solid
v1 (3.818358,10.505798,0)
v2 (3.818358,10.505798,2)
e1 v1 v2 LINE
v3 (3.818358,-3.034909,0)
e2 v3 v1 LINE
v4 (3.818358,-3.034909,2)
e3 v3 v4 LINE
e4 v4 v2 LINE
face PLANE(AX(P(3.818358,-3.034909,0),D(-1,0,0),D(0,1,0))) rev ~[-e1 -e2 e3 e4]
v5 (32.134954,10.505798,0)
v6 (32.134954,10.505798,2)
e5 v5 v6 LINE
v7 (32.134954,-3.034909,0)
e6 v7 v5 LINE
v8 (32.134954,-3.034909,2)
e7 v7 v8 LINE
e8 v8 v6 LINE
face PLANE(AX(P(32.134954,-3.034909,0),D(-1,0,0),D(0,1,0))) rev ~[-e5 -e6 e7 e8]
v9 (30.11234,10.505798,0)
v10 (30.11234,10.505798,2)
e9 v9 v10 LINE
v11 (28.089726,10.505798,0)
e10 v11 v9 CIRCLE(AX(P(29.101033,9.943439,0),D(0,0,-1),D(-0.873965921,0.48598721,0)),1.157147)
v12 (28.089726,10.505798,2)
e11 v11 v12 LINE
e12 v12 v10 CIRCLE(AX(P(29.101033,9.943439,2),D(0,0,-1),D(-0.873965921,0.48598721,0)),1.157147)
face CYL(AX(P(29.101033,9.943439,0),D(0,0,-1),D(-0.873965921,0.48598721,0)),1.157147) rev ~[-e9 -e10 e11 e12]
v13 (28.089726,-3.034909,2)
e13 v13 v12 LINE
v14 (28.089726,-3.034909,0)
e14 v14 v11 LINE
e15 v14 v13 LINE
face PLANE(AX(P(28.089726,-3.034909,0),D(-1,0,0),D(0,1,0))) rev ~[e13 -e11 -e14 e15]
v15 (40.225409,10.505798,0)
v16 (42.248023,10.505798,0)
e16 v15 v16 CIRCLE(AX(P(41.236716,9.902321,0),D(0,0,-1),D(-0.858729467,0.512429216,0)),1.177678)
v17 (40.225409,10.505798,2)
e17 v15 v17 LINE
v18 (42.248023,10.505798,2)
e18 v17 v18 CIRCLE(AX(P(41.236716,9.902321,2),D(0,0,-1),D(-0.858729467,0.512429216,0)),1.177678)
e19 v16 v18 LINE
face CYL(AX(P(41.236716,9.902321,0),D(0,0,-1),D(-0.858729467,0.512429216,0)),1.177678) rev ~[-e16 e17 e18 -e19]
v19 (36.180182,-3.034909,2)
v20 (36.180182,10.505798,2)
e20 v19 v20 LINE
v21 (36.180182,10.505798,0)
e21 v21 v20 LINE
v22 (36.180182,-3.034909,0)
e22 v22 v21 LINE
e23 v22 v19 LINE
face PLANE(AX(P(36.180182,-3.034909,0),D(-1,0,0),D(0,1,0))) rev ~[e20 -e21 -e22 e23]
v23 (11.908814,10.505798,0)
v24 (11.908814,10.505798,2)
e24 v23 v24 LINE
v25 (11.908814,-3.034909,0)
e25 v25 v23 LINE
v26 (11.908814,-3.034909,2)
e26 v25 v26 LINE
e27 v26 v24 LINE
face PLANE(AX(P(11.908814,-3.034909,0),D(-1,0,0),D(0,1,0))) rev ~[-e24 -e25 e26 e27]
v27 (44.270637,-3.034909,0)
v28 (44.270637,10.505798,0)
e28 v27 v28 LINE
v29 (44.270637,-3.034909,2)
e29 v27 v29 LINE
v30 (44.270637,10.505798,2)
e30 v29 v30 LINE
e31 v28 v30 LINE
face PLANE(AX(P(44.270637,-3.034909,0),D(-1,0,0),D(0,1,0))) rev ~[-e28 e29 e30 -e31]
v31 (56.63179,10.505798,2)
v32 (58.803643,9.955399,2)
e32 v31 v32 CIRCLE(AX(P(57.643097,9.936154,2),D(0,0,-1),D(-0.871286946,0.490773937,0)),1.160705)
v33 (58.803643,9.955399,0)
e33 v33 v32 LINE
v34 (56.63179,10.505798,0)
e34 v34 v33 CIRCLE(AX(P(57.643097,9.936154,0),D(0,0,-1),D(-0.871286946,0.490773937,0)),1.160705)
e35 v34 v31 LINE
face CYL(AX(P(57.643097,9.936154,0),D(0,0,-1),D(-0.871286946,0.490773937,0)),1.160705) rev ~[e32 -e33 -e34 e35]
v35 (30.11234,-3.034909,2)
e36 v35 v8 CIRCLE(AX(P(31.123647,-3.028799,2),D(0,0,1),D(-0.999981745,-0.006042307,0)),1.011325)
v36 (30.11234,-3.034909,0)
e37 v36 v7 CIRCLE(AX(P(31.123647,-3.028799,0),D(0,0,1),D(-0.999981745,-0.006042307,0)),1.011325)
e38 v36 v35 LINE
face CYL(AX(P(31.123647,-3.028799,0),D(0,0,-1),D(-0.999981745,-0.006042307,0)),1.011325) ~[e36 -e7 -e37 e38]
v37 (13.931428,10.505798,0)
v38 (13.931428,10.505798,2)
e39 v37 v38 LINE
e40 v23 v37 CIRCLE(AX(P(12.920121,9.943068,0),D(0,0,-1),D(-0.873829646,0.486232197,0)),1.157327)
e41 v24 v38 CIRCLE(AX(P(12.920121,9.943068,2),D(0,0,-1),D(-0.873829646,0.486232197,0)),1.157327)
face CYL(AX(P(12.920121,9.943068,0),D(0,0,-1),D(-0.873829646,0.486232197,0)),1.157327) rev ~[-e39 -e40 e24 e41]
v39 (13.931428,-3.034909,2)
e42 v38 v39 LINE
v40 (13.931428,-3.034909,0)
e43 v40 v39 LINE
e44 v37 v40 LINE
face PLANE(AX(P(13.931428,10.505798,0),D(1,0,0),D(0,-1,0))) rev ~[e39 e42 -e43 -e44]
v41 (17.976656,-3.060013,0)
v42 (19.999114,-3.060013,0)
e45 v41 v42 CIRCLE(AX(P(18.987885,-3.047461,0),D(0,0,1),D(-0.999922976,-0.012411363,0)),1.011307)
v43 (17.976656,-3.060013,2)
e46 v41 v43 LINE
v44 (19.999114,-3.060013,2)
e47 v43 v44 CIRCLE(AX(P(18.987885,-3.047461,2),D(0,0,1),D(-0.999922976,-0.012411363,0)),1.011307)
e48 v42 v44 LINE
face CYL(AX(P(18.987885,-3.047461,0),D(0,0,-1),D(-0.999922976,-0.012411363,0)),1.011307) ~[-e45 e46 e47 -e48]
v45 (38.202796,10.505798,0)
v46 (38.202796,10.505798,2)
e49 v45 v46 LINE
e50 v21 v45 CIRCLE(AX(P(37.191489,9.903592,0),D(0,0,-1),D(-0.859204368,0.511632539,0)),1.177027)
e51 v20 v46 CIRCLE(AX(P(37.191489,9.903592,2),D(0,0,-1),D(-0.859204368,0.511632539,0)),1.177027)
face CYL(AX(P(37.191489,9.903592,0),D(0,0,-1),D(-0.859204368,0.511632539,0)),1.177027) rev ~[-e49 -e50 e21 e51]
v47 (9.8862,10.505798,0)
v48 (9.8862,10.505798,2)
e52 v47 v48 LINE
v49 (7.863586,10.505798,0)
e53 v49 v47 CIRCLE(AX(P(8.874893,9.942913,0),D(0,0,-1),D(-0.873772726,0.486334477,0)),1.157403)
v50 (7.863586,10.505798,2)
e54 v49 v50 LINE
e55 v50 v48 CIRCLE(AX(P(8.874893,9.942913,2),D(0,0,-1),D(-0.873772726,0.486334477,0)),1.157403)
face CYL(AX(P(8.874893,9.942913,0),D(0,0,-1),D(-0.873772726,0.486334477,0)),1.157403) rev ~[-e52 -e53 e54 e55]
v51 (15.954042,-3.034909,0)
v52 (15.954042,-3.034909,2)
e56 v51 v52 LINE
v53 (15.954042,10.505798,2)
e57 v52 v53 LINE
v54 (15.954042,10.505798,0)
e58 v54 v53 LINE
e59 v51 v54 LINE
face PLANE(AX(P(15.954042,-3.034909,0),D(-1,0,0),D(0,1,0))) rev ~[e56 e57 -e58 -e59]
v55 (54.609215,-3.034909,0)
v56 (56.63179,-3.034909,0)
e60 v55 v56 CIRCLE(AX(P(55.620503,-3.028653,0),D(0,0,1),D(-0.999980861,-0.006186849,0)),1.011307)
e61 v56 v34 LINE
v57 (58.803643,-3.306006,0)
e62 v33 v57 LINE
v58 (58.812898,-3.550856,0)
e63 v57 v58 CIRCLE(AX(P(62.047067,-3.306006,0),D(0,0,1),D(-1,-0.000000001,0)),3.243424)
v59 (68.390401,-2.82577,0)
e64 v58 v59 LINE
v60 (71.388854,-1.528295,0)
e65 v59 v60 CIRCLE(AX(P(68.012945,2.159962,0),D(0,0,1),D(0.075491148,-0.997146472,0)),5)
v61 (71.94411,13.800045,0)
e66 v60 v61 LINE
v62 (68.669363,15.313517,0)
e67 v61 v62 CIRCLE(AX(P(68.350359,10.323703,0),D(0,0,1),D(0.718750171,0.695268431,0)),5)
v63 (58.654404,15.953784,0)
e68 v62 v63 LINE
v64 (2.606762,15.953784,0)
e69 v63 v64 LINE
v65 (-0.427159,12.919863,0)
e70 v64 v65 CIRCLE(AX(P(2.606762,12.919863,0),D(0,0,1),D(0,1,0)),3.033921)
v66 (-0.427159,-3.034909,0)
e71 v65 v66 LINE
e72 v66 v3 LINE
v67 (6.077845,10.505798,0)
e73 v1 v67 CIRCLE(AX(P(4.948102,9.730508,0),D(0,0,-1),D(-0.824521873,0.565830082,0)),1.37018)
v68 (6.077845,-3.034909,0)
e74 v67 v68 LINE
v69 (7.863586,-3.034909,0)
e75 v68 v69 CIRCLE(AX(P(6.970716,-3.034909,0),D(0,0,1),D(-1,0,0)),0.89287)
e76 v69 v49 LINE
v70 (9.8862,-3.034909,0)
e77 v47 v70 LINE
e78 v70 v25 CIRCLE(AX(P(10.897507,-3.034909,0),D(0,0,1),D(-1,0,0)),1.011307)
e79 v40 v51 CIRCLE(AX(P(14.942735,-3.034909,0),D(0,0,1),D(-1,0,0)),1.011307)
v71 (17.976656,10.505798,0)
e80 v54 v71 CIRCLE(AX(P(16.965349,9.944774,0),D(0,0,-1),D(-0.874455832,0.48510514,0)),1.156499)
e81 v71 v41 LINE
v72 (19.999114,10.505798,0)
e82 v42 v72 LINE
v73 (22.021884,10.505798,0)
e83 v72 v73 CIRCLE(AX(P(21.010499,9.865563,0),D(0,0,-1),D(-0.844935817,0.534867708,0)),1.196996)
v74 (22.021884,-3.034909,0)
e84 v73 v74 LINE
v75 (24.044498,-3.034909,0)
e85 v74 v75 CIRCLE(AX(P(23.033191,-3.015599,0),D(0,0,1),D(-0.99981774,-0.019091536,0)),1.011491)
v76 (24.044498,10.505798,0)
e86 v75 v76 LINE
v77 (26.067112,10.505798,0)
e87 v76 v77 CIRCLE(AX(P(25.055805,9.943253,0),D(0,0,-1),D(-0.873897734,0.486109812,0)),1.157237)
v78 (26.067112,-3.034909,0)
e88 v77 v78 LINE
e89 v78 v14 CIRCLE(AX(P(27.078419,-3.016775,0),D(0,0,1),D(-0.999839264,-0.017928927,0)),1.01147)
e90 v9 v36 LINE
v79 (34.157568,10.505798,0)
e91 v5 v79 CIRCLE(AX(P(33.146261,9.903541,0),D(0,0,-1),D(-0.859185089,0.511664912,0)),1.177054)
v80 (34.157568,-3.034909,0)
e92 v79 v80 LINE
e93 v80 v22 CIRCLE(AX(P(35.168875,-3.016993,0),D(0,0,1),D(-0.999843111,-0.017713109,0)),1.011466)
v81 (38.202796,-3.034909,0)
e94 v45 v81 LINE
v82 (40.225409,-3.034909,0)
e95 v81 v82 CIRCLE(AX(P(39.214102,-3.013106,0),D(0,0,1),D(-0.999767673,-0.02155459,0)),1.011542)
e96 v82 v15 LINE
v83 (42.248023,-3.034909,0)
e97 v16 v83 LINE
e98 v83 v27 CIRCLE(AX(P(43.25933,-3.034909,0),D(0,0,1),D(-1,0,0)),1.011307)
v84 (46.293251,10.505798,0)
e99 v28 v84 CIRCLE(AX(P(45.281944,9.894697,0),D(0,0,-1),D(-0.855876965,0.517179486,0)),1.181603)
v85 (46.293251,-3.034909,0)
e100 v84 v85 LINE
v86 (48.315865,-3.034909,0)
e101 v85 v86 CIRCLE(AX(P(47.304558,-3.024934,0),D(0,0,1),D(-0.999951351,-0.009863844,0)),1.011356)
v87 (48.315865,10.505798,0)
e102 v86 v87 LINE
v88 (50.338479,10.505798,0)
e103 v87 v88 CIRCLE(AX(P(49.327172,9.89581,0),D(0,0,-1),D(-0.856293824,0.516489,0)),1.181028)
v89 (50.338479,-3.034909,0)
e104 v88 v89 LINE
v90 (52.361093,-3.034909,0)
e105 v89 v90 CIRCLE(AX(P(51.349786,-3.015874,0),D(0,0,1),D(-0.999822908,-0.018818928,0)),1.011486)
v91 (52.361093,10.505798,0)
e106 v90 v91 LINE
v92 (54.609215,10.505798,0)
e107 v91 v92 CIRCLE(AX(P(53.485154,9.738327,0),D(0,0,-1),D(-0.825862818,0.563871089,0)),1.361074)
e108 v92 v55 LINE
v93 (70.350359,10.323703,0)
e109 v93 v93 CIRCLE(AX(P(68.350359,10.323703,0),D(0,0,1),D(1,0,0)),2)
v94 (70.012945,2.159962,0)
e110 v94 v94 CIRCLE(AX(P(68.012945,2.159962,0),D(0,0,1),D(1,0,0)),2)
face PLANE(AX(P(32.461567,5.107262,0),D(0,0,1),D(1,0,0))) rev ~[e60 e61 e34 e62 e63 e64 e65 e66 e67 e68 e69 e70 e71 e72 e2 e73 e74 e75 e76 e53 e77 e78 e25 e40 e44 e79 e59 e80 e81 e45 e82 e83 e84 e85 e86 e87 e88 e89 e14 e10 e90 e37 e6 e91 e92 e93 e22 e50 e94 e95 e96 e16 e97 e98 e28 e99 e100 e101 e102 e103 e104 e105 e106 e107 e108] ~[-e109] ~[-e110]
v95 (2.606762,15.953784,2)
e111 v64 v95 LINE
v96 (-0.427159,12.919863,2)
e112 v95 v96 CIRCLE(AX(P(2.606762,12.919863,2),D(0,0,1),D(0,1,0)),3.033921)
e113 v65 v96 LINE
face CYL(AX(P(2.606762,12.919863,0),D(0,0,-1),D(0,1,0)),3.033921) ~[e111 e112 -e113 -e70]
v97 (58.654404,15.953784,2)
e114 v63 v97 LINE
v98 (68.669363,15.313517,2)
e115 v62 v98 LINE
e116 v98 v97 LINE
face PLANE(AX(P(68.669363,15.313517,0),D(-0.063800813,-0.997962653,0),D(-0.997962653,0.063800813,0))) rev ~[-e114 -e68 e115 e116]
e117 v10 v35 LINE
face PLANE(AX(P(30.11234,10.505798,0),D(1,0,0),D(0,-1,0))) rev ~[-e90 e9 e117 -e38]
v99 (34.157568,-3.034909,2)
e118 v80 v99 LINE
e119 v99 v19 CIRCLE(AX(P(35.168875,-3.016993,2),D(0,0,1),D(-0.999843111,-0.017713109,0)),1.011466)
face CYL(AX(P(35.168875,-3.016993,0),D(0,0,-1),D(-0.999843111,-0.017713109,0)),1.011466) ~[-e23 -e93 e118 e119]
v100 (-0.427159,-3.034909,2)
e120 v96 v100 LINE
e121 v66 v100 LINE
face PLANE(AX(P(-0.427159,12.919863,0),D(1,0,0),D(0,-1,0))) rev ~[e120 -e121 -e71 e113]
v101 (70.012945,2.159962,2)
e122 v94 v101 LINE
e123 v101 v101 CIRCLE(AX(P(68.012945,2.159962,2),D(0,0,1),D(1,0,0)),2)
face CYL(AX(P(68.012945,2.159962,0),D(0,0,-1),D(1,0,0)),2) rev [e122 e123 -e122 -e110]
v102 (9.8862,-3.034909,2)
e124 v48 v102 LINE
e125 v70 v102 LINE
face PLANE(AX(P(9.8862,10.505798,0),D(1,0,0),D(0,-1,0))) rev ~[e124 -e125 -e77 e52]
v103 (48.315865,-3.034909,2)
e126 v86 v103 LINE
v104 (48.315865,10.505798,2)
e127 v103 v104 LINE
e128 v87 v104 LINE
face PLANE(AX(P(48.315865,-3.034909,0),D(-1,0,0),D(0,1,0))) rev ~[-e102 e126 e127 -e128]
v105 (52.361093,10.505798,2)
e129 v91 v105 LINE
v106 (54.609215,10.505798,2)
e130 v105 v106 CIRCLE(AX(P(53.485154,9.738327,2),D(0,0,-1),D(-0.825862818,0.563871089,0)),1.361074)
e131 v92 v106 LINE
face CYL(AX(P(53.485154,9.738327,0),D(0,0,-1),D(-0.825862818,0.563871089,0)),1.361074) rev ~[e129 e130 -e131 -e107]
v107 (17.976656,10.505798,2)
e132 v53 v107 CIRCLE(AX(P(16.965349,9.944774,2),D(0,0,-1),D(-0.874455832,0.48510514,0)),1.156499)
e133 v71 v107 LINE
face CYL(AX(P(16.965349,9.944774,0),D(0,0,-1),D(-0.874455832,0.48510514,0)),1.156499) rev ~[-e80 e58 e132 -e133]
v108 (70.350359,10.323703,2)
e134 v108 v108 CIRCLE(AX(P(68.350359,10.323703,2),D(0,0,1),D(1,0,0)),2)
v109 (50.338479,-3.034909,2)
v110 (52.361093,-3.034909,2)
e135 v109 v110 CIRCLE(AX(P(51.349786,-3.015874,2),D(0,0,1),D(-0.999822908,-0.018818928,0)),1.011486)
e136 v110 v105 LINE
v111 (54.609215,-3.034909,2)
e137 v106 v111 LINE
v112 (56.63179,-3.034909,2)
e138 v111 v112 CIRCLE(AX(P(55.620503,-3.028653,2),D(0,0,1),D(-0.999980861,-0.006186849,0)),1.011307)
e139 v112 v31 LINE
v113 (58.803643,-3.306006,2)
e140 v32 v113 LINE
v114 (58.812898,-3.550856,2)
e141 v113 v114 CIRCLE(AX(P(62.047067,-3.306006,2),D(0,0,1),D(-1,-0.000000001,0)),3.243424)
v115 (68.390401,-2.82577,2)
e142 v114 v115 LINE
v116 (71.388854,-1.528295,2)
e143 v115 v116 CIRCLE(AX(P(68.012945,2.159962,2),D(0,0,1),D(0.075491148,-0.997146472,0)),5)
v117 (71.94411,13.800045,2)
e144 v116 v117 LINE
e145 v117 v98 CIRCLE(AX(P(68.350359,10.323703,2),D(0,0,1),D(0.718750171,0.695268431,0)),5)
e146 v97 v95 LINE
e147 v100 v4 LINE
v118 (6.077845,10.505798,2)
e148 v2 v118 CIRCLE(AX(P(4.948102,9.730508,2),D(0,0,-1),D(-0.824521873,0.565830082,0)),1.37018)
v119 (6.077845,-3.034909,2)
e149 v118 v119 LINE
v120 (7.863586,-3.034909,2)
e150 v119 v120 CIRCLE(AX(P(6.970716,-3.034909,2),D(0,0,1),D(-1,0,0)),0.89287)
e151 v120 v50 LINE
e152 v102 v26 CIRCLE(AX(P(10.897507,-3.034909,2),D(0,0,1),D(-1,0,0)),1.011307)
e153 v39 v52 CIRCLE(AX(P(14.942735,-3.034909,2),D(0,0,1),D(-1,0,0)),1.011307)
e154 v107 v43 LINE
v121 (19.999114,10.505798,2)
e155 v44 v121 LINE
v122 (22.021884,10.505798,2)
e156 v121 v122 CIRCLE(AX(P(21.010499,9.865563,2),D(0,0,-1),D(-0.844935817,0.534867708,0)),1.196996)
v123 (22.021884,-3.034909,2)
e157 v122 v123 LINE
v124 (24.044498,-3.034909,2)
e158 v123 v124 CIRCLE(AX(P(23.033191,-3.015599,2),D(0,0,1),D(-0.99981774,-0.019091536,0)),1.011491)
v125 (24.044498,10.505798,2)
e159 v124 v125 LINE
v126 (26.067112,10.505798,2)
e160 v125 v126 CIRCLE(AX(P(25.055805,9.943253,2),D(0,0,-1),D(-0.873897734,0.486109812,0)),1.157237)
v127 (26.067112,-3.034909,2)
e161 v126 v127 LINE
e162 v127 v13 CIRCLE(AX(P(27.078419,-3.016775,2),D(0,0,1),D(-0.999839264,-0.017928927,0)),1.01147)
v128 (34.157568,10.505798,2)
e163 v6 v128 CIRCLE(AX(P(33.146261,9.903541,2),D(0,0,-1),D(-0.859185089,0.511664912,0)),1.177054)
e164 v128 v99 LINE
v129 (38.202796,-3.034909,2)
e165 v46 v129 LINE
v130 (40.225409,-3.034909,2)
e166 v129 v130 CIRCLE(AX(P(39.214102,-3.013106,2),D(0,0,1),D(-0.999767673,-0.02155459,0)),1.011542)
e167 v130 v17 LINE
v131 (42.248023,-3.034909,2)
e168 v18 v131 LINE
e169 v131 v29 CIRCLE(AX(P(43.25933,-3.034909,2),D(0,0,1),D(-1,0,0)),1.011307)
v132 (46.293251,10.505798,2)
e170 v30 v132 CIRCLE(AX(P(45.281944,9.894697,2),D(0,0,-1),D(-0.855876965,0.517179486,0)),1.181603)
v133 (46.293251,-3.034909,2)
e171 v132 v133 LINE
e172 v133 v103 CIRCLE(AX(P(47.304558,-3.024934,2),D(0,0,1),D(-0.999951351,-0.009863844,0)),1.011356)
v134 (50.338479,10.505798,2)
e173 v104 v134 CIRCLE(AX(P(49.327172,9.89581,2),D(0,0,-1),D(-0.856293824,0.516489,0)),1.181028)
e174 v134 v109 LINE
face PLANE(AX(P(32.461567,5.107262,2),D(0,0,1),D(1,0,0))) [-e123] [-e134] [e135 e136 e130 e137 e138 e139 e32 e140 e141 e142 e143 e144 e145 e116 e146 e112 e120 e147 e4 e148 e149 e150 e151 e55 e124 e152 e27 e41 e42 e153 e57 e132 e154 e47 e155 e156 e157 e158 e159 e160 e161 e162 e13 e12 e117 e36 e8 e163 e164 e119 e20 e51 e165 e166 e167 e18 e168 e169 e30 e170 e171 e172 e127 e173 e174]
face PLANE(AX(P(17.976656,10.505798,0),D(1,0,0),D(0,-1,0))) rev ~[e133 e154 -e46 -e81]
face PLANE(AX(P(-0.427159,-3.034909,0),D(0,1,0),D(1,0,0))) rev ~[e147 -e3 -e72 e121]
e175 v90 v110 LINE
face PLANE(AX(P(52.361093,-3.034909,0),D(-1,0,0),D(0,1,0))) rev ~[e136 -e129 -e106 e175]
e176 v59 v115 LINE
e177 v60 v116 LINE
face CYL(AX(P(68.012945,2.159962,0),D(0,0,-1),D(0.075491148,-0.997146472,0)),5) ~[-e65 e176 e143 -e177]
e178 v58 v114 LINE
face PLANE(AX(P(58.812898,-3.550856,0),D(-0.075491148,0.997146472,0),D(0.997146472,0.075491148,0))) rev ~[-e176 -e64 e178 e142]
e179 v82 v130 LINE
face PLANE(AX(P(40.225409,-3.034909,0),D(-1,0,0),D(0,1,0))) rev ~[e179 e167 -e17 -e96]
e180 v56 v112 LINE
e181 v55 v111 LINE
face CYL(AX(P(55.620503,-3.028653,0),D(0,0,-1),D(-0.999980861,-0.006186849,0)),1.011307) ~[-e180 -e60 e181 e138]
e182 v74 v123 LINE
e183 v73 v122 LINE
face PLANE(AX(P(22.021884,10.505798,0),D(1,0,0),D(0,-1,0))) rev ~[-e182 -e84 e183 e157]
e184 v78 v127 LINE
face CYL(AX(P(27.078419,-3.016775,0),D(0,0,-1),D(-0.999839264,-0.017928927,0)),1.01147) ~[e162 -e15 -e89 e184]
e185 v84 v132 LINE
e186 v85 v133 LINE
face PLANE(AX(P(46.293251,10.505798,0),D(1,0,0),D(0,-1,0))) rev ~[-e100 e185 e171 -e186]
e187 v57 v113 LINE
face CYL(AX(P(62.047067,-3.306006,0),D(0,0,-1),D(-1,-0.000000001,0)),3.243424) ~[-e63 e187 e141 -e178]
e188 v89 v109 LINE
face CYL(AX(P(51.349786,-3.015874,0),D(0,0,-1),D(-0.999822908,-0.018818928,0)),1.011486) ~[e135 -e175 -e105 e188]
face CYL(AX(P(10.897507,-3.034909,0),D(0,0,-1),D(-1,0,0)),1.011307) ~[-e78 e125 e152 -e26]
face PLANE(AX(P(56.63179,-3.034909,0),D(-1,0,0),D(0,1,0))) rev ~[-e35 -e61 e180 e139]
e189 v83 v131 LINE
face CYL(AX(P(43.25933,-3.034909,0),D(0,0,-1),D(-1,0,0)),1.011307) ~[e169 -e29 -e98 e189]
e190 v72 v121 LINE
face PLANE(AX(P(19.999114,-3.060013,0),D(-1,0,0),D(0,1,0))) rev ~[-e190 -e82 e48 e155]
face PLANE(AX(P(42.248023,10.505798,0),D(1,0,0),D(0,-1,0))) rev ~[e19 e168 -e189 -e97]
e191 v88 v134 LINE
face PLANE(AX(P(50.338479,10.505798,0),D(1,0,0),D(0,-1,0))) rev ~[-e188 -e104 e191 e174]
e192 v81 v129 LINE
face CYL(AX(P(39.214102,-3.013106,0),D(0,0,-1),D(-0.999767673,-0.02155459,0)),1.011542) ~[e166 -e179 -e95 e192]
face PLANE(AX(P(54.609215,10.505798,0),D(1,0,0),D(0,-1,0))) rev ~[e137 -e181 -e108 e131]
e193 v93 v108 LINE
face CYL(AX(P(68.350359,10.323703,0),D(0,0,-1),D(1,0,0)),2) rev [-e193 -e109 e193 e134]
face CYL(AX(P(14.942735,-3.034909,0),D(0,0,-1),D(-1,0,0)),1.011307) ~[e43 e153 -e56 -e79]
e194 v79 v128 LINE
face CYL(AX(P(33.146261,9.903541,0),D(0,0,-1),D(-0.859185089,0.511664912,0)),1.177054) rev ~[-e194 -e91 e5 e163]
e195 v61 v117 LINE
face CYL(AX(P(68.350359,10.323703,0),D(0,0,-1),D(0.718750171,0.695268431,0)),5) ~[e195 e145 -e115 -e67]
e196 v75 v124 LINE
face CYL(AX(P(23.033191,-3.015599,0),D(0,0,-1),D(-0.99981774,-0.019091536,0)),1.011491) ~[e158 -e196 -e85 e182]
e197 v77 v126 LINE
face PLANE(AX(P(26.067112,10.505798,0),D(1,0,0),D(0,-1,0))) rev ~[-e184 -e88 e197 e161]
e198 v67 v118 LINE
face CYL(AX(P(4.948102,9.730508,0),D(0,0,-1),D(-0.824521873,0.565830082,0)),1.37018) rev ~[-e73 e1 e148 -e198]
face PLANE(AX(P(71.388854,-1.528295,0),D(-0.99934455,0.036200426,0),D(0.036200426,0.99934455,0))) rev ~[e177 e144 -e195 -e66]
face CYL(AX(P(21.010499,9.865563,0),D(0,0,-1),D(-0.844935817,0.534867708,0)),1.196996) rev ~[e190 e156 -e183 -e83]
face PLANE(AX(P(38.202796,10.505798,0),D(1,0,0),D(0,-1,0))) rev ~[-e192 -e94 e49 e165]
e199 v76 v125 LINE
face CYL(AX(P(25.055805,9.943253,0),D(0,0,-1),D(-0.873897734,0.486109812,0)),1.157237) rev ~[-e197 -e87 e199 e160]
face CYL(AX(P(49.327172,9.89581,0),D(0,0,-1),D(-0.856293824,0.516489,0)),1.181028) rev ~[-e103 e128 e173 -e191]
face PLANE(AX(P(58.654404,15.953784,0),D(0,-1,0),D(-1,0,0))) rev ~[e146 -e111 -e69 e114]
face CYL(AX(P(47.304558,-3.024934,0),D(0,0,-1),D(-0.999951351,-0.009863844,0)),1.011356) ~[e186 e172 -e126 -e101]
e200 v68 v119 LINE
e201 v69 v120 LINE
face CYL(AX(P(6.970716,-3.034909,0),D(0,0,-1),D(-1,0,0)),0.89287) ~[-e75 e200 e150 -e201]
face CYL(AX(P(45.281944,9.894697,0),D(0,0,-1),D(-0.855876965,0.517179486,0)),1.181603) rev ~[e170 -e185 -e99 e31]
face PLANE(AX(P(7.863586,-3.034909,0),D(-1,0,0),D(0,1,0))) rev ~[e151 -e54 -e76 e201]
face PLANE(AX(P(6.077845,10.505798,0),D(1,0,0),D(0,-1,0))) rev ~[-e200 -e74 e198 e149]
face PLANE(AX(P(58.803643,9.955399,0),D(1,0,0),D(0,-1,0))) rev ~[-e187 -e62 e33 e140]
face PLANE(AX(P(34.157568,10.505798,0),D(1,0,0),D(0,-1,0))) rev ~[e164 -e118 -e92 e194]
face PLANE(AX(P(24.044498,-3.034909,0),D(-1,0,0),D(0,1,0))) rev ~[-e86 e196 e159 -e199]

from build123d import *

# Parameters (mm, degrees)
F0_R     = 2
F1_DEPTH = 2


# Not quite as in the source:
# - a feature names something its author has since deleted; it is built from what else it names


with BuildPart() as f1:
    # F0 (on Top) → F1 (new body)
    with BuildSketch(Plane.XY):
        with BuildLine():
            Line((56.6317902379, -3.0349094544), (56.6317902379, 10.5057977874))
            ThreePointArc((56.6317902379, 10.5057977874), (57.9282334063, 11.0612910292), (58.8036425211, 9.955399302))
            Line((58.8036425211, 9.955399302), (58.8036425211, -3.3060063632))
            ThreePointArc((58.8036425211, -3.3060063632), (58.8059571474, -3.4285186947), (58.8128977225, -3.5508561677))
            Line((58.8128977225, -3.5508561677), (68.3904010917, -2.8257703951))
            ThreePointArc((68.3904010917, -2.8257703951), (69.9985927846, -2.4288509841), (71.3888536722, -1.5282954863))
            Line((71.3888536722, -1.5282954863), (71.9441100955, 13.8000454754))
            ThreePointArc((71.9441100955, 13.8000454754), (70.4479915869, 14.8624188349), (68.6693633039, 15.3135165823))
            Line((68.6693633039, 15.3135165823), (58.6544042145, 15.9537835574))
            Line((58.6544042145, 15.9537835574), (2.6067622363, 15.9537835574))
            ThreePointArc((2.6067622363, 15.9537835574), (0.4614561486, 15.0651686804), (-0.4271587284, 12.9198625927))
            Line((-0.4271587284, 12.9198625927), (-0.4271587284, -3.0349094544))
            Line((-0.4271587284, -3.0349094544), (3.8183579072, -3.0349094544))
            Line((3.8183579072, -3.0349094544), (3.8183579072, 2.3688513962))
            Line((3.8183579072, 2.3688513962), (3.8183579072, 10.5057977874))
            ThreePointArc((3.8183579072, 10.5057977874), (4.9481016159, 11.1006888991), (6.0778453246, 10.5057977874))
            Line((6.0778453246, 10.5057977874), (6.0778453246, 2.3688513962))
            Line((6.0778453246, 2.3688513962), (6.0778453246, -3.0349094544))
            ThreePointArc((6.0778453246, -3.0349094544), (6.9707155924, -3.9277797221), (7.8635858601, -3.0349094544))
            Line((7.8635858601, -3.0349094544), (7.8635858601, 2.3688513962))
            Line((7.8635858601, 2.3688513962), (7.8635858601, 10.5057977874))
            ThreePointArc((7.8635858601, 10.5057977874), (8.8748928484, 11.1003156957), (9.8861998366, 10.5057977874))
            Line((9.8861998366, 10.5057977874), (9.8861998366, 2.3688513962))
            Line((9.8861998366, 2.3688513962), (9.8861998366, -3.0349094544))
            ThreePointArc((9.8861998366, -3.0349094544), (10.8975068249, -4.0462164426), (11.9088138131, -3.0349094544))
            Line((11.9088138131, -3.0349094544), (11.9088138131, 2.3688513962))
            Line((11.9088138131, 2.3688513962), (11.9088138131, 10.5057977874))
            ThreePointArc((11.9088138131, 10.5057977874), (12.9201208014, 11.1003953408), (13.9314277896, 10.5057977874))
            Line((13.9314277896, 10.5057977874), (13.9314277896, 2.3688513962))
            Line((13.9314277896, 2.3688513962), (13.9314277896, -3.0349094544))
            ThreePointArc((13.9314277896, -3.0349094544), (14.9427347779, -4.0462164426), (15.9540417661, -3.0349094544))
            Line((15.9540417661, -3.0349094544), (15.9540417661, 2.3688513962))
            Line((15.9540417661, 2.3688513962), (15.9540417661, 10.5057977874))
            ThreePointArc((15.9540417661, 10.5057977874), (16.9653487543, 11.1012729968), (17.9766557426, 10.5057977874))
            Line((17.9766557426, 10.5057977874), (17.9766557426, -3.0349094544))
            Line((17.9766557426, -3.0349094544), (17.9766557426, -3.0600128507))
            ThreePointArc((17.9766557426, -3.0600128507), (18.987884836, -4.0587681408), (19.9991139294, -3.0600128507))
            Line((19.9991139294, -3.0600128507), (19.9991139294, -3.0349094544))
            Line((19.9991139294, -3.0349094544), (19.9991139294, 2.3688513962))
            Line((19.9991139294, 2.3688513962), (19.9991139294, 10.5057977874))
            ThreePointArc((19.9991139294, 10.5057977874), (21.0104988125, 11.0625593301), (22.0218836956, 10.5057977874))
            Line((22.0218836956, 10.5057977874), (22.0218836956, 2.3688513962))
            Line((22.0218836956, 2.3688513962), (22.0218836956, -3.0349094544))
            ThreePointArc((22.0218836956, -3.0349094544), (23.0331906838, -4.0270898738), (24.0444976721, -3.0349094544))
            Line((24.0444976721, -3.0349094544), (24.0444976721, 2.3688513962))
            Line((24.0444976721, 2.3688513962), (24.0444976721, 10.5057977874))
            ThreePointArc((24.0444976721, 10.5057977874), (25.0558046603, 11.1004906415), (26.0671116486, 10.5057977874))
            Line((26.0671116486, 10.5057977874), (26.0671116486, 2.3688513962))
            Line((26.0671116486, 2.3688513962), (26.0671116486, -3.0349094544))
            ThreePointArc((26.0671116486, -3.0349094544), (27.0784186368, -4.0282444578), (28.089725625, -3.0349094544))
            Line((28.089725625, -3.0349094544), (28.089725625, 2.3688513962))
            Line((28.089725625, 2.3688513962), (28.089725625, 10.5057977874))
            ThreePointArc((28.089725625, 10.5057977874), (29.1010326133, 11.1005861122), (30.1123396015, 10.5057977874))
            Line((30.1123396015, 10.5057977874), (30.1123396015, 2.3688513962))
            Line((30.1123396015, 2.3688513962), (30.1123396015, -3.0349094544))
            ThreePointArc((30.1123396015, -3.0349094544), (31.1236465898, -4.0401241658), (32.134953578, -3.0349094544))
            Line((32.134953578, -3.0349094544), (32.134953578, 2.3688513962))
            Line((32.134953578, 2.3688513962), (32.134953578, 10.5057977874))
            ThreePointArc((32.134953578, 10.5057977874), (33.1462605663, 11.0805944093), (34.1575675545, 10.5057977874))
            Line((34.1575675545, 10.5057977874), (34.1575675545, 2.3688513962))
            Line((34.1575675545, 2.3688513962), (34.1575675545, -3.0349094544))
            ThreePointArc((34.1575675545, -3.0349094544), (35.1688745428, -4.0284589293), (36.180181531, -3.0349094544))
            Line((36.180181531, -3.0349094544), (36.180181531, 2.3688513962))
            Line((36.180181531, 2.3688513962), (36.180181531, 10.5057977874))
            ThreePointArc((36.180181531, 10.5057977874), (37.1914885192, 11.0806196167), (38.2027955075, 10.5057977874))
            Line((38.2027955075, 10.5057977874), (38.2027955075, 2.3688513962))
            Line((38.2027955075, 2.3688513962), (38.2027955075, -3.0349094544))
            ThreePointArc((38.2027955075, -3.0349094544), (39.2141024957, -4.0246480782), (40.225409484, -3.0349094544))
            Line((40.225409484, -3.0349094544), (40.225409484, 2.3688513962))
            Line((40.225409484, 2.3688513962), (40.225409484, 10.5057977874))
            ThreePointArc((40.225409484, 10.5057977874), (41.2367164722, 11.0799992786), (42.2480234605, 10.5057977874))
            Line((42.2480234605, 10.5057977874), (42.2480234605, 2.3688513962))
            Line((42.2480234605, 2.3688513962), (42.2480234605, -3.0349094544))
            ThreePointArc((42.2480234605, -3.0349094544), (43.2593304487, -4.0462164426), (44.270637437, -3.0349094544))
            Line((44.270637437, -3.0349094544), (44.270637437, 2.3688513962))
            Line((44.270637437, 2.3688513962), (44.270637437, 10.5057977874))
            ThreePointArc((44.270637437, 10.5057977874), (45.2819444252, 11.0763000676), (46.2932514135, 10.5057977874))
            Line((46.2932514135, 10.5057977874), (46.2932514135, 2.3688513962))
            Line((46.2932514135, 2.3688513962), (46.2932514135, -3.0349094544))
            ThreePointArc((46.2932514135, -3.0349094544), (47.3045584017, -4.0362897846), (48.3158653899, -3.0349094544))
            Line((48.3158653899, -3.0349094544), (48.3158653899, 2.3688513962))
            Line((48.3158653899, 2.3688513962), (48.3158653899, 10.5057977874))
            ThreePointArc((48.3158653899, 10.5057977874), (49.3271723782, 11.0768378201), (50.3384793664, 10.5057977874))
            Line((50.3384793664, 10.5057977874), (50.3384793664, 2.3688513962))
            Line((50.3384793664, 2.3688513962), (50.3384793664, -3.0349094544))
            ThreePointArc((50.3384793664, -3.0349094544), (51.3497863547, -4.0273604844), (52.3610933429, -3.0349094544))
            Line((52.3610933429, -3.0349094544), (52.3610933429, 2.3688513962))
            Line((52.3610933429, 2.3688513962), (52.3610933429, 10.5057977874))
            ThreePointArc((52.3610933429, 10.5057977874), (53.4851541573, 11.0994017223), (54.6092149717, 10.5057977874))
            Line((54.6092149717, 10.5057977874), (54.6092149717, 2.3688513962))
            Line((54.6092149717, 2.3688513962), (54.6092149717, -3.0349094544))
            ThreePointArc((54.6092149717, -3.0349094544), (55.6205026048, -4.039959639), (56.6317902379, -3.0349094544))
        make_face()
        with Locations((68.012945354, 2.1599619649)):
            Circle(F0_R, mode=Mode.SUBTRACT)
        with Locations((68.3503592405, 10.3237033185)):
            Circle(F0_R, mode=Mode.SUBTRACT)
    extrude(amount=F1_DEPTH)


solid = f1.part
